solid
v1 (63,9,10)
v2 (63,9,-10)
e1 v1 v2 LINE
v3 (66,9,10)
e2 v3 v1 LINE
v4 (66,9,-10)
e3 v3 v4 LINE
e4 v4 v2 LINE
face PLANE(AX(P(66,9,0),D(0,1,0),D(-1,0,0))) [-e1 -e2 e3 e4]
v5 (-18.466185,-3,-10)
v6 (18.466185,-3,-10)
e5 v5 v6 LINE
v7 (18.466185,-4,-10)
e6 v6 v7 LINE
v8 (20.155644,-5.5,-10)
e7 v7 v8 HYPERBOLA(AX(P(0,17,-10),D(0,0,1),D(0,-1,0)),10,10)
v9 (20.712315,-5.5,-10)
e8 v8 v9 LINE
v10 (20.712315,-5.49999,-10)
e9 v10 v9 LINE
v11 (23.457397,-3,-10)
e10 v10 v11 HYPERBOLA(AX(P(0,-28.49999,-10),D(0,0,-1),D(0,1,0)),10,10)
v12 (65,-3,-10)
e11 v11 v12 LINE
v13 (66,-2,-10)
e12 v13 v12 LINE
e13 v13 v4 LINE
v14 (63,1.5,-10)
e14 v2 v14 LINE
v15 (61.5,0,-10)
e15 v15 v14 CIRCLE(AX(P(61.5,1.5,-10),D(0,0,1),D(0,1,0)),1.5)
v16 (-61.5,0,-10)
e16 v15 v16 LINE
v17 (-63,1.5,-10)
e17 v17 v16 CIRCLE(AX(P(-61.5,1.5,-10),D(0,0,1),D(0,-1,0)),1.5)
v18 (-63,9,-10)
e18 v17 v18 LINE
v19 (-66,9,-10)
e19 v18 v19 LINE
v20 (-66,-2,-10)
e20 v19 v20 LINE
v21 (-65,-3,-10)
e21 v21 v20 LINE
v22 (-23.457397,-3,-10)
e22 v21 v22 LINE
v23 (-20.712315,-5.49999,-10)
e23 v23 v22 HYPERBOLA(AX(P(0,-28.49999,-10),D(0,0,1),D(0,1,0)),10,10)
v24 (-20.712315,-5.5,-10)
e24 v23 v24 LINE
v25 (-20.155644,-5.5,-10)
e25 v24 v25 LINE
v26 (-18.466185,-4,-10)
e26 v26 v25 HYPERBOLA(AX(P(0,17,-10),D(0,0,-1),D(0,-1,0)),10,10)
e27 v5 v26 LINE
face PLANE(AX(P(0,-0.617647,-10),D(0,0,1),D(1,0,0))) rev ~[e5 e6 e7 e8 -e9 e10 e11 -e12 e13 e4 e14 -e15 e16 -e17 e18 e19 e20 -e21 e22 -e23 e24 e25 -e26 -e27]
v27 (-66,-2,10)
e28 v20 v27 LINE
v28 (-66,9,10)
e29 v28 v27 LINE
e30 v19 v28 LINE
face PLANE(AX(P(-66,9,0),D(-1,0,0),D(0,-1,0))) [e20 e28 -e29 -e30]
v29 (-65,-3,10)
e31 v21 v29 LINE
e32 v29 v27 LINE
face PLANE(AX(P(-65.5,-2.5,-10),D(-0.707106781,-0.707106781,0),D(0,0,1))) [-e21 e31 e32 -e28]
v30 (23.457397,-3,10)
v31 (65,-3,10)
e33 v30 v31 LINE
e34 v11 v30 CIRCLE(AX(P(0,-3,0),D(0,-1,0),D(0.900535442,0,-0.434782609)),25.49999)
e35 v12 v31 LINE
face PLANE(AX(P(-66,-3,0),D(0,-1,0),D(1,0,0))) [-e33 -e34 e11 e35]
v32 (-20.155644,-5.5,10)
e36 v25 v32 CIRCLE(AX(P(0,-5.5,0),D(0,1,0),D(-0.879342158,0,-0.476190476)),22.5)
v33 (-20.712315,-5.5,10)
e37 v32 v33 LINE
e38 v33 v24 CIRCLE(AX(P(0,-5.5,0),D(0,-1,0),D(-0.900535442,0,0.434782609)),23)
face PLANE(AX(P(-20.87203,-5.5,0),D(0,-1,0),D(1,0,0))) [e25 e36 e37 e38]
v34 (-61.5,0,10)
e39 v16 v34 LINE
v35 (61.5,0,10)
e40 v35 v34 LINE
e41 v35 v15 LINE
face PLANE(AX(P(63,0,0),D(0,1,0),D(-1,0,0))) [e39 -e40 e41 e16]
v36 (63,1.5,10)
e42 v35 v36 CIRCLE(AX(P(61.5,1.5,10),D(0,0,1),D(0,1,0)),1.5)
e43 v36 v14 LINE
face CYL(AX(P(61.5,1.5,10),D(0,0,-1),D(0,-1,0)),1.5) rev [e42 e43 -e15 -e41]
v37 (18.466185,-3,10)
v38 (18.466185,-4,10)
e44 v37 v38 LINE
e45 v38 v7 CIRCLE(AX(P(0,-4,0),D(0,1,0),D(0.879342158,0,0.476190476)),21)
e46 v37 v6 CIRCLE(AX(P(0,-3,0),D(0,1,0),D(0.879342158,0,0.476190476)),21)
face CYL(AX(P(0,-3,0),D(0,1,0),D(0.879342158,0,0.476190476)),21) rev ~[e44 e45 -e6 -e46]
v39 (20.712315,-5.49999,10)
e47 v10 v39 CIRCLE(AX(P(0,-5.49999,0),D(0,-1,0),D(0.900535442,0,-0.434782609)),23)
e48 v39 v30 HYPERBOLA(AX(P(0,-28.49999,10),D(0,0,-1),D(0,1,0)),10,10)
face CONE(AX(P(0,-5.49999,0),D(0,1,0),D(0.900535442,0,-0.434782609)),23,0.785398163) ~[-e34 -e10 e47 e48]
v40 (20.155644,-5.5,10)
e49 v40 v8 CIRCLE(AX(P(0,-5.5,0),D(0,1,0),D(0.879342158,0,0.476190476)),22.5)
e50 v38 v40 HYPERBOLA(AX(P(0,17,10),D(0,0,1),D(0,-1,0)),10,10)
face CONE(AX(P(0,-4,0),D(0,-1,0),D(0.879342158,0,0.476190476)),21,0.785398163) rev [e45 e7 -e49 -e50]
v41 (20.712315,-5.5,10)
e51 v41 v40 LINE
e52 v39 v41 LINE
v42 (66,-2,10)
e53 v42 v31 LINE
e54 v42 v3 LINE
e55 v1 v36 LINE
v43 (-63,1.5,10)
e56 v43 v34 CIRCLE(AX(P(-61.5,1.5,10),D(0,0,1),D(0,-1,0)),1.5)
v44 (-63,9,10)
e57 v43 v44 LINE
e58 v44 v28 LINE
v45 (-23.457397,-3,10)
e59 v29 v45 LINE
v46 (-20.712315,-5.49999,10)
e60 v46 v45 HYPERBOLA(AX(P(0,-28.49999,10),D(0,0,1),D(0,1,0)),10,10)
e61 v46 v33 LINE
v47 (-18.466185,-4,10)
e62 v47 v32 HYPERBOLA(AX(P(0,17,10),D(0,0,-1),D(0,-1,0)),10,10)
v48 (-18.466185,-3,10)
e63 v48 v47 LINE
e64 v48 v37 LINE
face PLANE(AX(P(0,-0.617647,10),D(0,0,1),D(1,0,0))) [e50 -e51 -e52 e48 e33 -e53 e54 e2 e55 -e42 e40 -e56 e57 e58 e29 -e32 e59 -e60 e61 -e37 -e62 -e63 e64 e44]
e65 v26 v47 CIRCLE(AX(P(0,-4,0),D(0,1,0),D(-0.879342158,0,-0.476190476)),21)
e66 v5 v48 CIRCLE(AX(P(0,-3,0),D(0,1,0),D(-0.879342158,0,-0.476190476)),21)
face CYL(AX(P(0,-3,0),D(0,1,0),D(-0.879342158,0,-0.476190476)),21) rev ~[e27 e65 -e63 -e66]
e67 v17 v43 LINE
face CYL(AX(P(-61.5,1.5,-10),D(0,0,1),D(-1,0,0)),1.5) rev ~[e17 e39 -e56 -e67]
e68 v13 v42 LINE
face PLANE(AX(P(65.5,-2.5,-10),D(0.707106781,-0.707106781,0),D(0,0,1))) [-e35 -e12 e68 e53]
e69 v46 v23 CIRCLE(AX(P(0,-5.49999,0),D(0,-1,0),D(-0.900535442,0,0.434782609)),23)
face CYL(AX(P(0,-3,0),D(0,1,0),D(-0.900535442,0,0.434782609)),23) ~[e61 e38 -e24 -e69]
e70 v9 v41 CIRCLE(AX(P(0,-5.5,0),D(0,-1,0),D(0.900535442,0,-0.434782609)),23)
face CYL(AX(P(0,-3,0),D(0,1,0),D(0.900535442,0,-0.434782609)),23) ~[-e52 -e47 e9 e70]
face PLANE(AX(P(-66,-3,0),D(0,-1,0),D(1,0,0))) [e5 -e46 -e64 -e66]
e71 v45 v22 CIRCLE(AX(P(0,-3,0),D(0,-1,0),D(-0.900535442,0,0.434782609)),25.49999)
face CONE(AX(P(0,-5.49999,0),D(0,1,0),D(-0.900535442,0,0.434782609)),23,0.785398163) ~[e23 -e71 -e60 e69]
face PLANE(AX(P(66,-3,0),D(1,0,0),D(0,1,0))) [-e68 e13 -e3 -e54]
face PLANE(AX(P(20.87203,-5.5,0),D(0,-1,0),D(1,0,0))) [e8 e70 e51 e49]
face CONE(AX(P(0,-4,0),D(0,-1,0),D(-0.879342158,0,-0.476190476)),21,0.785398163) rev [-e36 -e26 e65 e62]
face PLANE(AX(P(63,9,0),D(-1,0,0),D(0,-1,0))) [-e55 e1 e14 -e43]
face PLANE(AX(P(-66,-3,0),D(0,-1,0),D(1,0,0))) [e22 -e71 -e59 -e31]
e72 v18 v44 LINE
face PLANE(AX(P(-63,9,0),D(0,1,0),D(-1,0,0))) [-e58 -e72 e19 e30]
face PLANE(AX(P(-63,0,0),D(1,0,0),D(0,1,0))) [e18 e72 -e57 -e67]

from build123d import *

# Parameters (mm, degrees)
F1_DEPTH = 10
F3_DEPTH = 2.5
F4_SIZE  = 1.5
F5_SIZE  = 2.49999
F6_SIZE  = 1
F7_R     = 1.5


# Not quite as in the source:
# - a fillet or chamfer is up to 0.001 mm smaller than in the source, because OpenCascade refuses the exact size


with BuildPart() as f1:
    # F0 (on Top) → F1 (new body, symmetric)
    with BuildSketch(Plane.XY):
        Polygon((63, 0), (-63, 0), (-63, 9), (-66, 9), (-66, -3), (66, -3), (66, 9), (63, 9), align=None)
    extrude(amount=F1_DEPTH, both=True)

    # F2 (on face) → F3 (join)
    with BuildSketch(Plane.XZ.offset(3)):
        with BuildLine():
            ThreePointArc((-18.4661853126, -10), (-21, 0), (-18.4661853126, 10))
            Line((-18.4661853126, 10), (-20.7123151772, 10))
            ThreePointArc((-20.7123151772, 10), (-23, 0), (-20.7123151772, -10))
            Line((-20.7123151772, -10), (-18.4661853126, -10))
        make_face()
        with BuildLine():
            Line((20.7123151772, 10), (18.4661853126, 10))
            ThreePointArc((18.4661853126, 10), (21, 0), (18.4661853126, -10))
            Line((18.4661853126, -10), (20.7123151772, -10))
            ThreePointArc((20.7123151772, -10), (23, 0), (20.7123151772, 10))
        make_face()
    extrude(amount=F3_DEPTH)

    # F4
    f4_edges = [f1.edges().sort_by_distance(p)[0] for p in [
        (-21, -5.5, 0),
        (21, -5.5, 0),
    ]]
    chamfer(f4_edges, length=F4_SIZE)

    # F5 (size 2.5 in the source; OpenCascade refuses exactly that, so slightly less here)
    f5_edges = [f1.edges().sort_by_distance(p)[0] for p in [
        (-23, -3, 0),
        (23, -3, 0),
    ]]
    chamfer(f5_edges, length=F5_SIZE)

    # F6
    f6_edges = [f1.edges().sort_by_distance(p)[0] for p in [
        (-66, -3, 0),
        (66, -3, 0),
    ]]
    chamfer(f6_edges, length=F6_SIZE)

    # F7
    f7_edges = [f1.edges().sort_by_distance(p)[0] for p in [
        (63, 0, 0),
        (-63, 0, 0),
    ]]
    fillet(f7_edges, radius=F7_R)


solid = f1.part
